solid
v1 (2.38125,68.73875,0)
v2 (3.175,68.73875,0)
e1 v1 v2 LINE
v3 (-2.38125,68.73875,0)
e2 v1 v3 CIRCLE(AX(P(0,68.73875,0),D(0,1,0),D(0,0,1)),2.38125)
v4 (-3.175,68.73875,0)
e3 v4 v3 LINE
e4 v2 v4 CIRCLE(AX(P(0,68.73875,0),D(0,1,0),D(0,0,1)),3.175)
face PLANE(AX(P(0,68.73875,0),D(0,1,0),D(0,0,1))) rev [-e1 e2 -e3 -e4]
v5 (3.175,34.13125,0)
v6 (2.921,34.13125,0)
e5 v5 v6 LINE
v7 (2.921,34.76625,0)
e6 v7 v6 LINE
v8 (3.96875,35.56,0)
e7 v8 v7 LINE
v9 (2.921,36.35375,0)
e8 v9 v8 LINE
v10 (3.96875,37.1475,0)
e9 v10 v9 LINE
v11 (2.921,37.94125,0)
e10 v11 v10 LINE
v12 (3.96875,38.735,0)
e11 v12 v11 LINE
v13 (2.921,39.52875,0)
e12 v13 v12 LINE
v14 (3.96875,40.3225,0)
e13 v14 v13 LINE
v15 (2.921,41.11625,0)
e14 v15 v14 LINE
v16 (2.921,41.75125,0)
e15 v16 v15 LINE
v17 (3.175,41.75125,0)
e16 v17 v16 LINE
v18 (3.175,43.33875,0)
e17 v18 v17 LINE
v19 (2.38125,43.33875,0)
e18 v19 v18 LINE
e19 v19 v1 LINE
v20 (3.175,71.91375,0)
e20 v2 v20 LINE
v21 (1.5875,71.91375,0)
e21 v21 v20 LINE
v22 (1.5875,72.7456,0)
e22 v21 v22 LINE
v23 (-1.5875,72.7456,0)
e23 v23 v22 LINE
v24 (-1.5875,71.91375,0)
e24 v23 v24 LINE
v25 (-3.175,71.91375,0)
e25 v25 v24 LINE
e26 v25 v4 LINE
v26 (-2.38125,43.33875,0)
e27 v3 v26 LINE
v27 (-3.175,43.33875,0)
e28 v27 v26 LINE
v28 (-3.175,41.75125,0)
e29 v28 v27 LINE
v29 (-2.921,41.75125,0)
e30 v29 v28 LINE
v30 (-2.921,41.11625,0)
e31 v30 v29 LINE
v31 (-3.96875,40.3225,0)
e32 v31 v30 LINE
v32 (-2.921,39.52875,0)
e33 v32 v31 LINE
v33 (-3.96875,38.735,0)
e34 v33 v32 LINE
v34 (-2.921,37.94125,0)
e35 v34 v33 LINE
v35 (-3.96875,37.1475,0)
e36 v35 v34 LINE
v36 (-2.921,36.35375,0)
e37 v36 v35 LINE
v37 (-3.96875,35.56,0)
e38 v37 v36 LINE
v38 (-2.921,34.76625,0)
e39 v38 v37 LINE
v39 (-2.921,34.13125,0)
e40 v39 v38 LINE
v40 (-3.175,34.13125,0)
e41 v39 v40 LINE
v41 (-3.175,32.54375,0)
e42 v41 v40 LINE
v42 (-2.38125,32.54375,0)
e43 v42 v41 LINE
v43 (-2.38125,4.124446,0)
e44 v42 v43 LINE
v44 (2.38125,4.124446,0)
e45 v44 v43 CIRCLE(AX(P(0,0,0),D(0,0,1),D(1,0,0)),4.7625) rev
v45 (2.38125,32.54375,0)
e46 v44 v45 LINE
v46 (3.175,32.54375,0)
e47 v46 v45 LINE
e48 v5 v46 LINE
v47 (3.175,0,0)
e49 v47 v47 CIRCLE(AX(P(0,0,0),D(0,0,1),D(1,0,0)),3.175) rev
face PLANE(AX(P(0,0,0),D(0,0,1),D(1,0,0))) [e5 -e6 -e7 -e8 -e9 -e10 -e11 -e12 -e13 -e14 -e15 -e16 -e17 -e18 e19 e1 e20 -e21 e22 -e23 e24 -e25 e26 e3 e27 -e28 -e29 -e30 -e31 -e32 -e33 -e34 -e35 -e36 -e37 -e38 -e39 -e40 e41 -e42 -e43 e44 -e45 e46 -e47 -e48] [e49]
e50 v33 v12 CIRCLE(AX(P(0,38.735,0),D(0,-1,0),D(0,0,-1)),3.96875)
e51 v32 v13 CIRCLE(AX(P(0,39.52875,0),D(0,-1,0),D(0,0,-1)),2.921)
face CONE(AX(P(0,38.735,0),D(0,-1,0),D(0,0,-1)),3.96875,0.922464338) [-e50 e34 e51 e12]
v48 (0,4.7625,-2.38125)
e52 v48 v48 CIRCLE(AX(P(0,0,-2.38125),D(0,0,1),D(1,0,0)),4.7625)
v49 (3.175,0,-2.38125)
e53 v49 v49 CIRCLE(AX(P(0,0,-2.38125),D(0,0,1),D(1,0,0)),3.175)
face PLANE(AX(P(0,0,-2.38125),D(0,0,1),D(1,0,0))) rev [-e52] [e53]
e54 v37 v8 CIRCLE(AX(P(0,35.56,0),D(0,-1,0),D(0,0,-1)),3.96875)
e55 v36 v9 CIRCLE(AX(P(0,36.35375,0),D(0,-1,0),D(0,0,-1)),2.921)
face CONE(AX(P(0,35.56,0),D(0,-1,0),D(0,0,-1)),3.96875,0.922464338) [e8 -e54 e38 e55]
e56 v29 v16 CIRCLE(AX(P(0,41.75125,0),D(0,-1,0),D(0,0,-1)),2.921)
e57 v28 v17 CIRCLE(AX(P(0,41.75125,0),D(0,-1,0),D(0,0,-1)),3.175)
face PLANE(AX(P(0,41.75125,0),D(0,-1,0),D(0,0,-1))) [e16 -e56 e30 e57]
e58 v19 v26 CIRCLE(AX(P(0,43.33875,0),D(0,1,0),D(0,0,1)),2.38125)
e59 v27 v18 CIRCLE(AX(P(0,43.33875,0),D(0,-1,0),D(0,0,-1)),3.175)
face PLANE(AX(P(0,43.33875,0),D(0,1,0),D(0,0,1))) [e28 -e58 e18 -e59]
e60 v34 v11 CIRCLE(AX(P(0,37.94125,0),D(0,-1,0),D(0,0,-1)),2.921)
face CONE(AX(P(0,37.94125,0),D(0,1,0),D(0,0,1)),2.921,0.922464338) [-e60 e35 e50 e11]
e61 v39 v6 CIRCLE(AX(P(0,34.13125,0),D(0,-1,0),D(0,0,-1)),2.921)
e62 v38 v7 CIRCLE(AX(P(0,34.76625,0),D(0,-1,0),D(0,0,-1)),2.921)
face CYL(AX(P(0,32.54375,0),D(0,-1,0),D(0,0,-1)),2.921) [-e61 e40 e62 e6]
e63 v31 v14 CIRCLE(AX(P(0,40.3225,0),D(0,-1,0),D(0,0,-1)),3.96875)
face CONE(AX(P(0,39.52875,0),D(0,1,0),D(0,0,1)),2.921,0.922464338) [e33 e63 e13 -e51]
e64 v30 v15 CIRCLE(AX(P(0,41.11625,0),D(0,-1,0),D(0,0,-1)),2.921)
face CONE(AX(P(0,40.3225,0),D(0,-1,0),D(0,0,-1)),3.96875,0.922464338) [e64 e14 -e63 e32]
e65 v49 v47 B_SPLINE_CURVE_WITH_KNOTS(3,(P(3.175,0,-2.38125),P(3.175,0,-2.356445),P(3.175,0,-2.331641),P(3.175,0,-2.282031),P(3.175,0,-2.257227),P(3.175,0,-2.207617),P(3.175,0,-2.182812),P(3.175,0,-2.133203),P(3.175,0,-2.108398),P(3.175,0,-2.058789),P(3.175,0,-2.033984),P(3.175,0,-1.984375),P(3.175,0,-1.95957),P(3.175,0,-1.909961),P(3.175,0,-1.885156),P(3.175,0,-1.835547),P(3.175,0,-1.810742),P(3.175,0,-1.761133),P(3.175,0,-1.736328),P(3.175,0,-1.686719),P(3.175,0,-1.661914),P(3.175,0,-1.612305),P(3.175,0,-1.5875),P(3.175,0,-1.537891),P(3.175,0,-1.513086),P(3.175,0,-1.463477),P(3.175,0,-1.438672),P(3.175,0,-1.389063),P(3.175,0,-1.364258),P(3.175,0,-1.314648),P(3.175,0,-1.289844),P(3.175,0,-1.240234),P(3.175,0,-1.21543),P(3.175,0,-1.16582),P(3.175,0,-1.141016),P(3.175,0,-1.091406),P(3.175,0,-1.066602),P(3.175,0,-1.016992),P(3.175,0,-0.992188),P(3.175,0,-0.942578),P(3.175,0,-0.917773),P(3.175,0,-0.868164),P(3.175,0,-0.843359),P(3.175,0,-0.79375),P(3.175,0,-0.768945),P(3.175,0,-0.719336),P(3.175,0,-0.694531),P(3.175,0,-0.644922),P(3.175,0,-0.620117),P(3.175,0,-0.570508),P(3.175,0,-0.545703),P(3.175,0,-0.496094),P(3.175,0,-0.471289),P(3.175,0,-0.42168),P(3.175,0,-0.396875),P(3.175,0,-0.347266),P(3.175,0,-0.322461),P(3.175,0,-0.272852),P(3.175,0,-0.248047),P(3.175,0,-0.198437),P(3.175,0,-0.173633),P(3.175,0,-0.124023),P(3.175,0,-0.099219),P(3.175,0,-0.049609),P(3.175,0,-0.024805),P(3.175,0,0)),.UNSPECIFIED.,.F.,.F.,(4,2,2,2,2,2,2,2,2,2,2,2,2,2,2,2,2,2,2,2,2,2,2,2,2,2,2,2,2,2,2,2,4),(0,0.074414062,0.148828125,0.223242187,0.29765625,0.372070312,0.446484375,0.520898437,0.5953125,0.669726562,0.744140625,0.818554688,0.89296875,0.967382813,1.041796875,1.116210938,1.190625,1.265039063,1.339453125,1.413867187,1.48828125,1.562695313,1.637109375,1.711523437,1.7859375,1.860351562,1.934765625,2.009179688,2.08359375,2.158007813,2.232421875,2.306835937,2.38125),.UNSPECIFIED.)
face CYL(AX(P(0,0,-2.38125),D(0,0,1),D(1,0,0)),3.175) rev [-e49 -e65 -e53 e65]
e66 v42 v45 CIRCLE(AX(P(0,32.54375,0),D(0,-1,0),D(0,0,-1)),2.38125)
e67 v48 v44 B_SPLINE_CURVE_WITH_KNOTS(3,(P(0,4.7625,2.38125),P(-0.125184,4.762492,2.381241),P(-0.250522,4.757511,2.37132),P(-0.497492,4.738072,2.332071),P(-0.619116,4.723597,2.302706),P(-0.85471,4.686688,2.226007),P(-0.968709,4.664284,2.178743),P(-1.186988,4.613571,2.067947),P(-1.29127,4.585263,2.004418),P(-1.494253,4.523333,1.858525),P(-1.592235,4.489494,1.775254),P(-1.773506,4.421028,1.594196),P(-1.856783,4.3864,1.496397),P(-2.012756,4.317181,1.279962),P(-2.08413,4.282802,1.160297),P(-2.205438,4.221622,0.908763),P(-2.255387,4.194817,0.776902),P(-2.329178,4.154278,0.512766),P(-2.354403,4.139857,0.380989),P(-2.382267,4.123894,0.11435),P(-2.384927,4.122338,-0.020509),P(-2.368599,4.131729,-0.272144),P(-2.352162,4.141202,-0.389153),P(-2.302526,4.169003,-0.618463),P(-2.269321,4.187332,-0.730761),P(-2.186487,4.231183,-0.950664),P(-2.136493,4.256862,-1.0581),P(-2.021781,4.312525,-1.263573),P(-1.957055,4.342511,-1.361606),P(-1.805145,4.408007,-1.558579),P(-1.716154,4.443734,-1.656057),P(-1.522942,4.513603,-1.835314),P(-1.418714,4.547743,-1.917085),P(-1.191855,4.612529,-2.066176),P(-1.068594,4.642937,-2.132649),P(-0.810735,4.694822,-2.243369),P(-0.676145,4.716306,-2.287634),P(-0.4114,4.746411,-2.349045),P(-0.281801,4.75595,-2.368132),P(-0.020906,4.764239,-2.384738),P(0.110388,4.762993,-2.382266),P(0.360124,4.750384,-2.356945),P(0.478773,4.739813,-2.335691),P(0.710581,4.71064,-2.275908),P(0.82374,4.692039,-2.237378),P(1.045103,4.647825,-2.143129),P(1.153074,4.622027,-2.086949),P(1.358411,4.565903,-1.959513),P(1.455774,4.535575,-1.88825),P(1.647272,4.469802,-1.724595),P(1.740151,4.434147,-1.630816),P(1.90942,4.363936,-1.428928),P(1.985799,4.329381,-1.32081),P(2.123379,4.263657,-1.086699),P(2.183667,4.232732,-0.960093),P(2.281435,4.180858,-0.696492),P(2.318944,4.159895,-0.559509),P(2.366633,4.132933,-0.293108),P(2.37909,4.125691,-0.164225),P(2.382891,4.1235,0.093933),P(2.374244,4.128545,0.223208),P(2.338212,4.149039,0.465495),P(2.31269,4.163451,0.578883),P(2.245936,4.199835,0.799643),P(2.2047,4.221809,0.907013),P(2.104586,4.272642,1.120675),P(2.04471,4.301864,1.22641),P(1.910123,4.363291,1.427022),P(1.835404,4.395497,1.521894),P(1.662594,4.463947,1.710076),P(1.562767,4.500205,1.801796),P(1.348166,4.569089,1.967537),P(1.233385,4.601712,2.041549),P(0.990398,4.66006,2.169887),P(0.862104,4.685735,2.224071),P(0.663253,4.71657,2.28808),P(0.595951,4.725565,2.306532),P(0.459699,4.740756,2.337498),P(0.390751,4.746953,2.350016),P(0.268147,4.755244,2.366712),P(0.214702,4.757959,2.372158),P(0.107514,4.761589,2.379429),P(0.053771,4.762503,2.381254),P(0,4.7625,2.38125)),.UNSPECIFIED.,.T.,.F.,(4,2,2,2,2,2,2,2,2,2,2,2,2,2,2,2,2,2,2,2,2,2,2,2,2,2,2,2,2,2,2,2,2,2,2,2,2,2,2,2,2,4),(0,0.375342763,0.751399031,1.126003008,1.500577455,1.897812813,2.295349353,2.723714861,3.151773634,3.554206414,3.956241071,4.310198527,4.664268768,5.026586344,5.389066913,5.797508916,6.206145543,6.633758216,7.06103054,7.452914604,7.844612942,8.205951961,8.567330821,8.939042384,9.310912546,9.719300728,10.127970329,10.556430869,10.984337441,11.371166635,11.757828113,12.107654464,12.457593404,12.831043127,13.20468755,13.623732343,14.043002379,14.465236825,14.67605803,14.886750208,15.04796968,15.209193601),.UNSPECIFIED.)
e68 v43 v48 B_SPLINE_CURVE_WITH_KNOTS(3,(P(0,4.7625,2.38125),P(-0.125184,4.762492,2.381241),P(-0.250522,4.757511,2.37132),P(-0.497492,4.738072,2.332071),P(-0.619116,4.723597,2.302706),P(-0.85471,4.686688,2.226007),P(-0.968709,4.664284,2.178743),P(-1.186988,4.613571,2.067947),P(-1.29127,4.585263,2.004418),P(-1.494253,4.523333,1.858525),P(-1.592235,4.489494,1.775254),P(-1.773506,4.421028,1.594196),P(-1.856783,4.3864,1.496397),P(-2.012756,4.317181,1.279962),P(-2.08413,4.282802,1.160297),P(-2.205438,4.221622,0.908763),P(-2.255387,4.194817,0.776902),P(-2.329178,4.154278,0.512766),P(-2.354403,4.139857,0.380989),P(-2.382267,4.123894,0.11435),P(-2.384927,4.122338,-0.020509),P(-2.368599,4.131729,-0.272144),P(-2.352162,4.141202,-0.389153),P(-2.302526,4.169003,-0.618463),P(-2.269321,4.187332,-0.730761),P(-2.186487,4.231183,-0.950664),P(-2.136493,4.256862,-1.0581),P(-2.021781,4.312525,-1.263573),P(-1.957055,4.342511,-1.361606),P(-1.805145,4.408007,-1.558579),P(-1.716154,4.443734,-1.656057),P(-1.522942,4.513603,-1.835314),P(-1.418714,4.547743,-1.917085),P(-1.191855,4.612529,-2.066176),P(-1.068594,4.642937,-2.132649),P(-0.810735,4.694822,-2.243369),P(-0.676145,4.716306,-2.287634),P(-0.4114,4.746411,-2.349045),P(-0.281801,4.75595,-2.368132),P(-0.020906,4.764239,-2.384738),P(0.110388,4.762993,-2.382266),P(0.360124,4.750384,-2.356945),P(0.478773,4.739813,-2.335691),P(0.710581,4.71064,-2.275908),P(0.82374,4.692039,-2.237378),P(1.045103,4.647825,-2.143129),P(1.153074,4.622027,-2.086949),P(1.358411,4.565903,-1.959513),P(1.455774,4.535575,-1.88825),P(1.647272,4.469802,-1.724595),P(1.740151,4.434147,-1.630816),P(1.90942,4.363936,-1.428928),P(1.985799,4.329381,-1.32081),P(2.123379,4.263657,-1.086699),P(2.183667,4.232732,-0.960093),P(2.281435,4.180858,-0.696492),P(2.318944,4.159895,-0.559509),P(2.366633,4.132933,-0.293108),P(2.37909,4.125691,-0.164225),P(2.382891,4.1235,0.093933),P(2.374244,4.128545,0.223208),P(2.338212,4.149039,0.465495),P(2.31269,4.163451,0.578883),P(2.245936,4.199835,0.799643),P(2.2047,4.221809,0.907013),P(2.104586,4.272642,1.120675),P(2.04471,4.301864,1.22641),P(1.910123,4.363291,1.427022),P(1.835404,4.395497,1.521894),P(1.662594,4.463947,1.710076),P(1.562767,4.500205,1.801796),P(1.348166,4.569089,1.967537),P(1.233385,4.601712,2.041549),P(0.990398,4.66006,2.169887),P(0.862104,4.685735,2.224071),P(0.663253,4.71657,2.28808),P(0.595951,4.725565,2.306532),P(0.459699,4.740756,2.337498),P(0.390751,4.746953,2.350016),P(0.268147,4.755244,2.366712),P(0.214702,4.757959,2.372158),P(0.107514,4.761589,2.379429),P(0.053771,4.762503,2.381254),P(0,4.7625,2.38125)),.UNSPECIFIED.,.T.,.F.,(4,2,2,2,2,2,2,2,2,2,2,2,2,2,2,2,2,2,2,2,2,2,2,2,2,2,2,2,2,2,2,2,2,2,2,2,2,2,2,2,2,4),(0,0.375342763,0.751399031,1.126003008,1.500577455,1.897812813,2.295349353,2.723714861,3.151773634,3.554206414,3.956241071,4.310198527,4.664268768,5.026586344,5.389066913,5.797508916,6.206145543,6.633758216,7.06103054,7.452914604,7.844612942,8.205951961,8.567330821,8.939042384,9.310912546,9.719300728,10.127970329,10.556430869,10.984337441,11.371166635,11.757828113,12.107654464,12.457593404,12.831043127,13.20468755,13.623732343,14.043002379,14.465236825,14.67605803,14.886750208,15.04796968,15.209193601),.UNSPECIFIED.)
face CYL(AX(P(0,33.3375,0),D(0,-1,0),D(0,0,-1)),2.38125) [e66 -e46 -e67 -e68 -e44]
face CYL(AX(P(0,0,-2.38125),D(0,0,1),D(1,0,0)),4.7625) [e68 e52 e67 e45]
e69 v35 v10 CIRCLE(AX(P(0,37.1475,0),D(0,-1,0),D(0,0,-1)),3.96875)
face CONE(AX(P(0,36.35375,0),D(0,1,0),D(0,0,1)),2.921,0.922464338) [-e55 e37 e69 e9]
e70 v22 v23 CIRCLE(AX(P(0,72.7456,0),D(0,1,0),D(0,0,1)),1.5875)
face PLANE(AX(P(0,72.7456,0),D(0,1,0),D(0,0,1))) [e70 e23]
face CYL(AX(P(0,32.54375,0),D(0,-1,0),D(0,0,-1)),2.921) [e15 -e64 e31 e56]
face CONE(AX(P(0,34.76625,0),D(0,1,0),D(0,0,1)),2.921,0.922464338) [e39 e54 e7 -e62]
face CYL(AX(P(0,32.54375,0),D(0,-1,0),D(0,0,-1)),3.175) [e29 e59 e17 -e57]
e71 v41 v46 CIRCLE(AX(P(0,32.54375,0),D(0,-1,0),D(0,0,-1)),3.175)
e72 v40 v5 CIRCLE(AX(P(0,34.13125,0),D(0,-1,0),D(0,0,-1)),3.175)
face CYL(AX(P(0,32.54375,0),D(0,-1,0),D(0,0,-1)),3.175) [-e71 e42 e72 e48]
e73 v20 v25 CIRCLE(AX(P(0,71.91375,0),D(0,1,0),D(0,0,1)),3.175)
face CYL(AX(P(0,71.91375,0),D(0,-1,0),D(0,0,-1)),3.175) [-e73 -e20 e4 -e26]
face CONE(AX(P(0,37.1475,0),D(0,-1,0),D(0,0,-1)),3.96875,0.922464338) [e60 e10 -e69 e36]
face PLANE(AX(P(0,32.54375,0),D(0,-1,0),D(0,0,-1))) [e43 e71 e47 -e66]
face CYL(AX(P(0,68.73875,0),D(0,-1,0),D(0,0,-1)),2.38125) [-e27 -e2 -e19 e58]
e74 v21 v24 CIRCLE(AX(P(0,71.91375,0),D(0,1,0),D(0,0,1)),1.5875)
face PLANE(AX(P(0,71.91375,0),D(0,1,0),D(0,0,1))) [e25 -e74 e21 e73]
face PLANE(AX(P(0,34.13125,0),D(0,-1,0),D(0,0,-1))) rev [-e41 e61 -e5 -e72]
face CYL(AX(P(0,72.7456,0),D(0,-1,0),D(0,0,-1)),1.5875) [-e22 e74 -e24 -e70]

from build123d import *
from build123d.topology import SkipClean

# Parameters (mm, degrees)
BOSS_EXTRUDE1_DEPTH                  = 4.7625
BOSS_EXTRUDE1_DEPTH_BACK             = 2.38125
SKETCH1_R                            = 4.7625
SKETCH1_R_2                          = 3.175
SKETCH2_R                            = 2.38125
BOSS_EXTRUDE2_DEPTH                  = 28.575
BOSS_EXTRUDE2_DIRECTION_2_REACH      = 13.666
BOSS_EXTRUDE2_DIRECTION_2_END_RADIUS = 4.7625
BOSS_EXTRUDE3_START                  = 25.4
SKETCH4_R                            = 2.38125
BOSS_EXTRUDE3_DEPTH                  = 25.4
SKETCH5_R                            = 3.175
BOSS_EXTRUDE4_DEPTH                  = 3.175
SKETCH6_R                            = 1.5875
BOSS_EXTRUDE5_DEPTH                  = 0.83185
SKETCH7_W                            = 15.534712676
SKETCH7_H                            = 81.822586025
CUT_EXTRUDE1_DEPTH                   = 74.056725452


with BuildPart() as part:
    # Sketch1 → Boss-Extrude1 (new, two sides: drawn at the far end of the back side and taken through both)
    with BuildSketch(Plane.XY.offset(-BOSS_EXTRUDE1_DEPTH_BACK)):
        Circle(SKETCH1_R)
        Circle(SKETCH1_R_2, mode=Mode.SUBTRACT)
    extrude(amount=BOSS_EXTRUDE1_DEPTH + BOSS_EXTRUDE1_DEPTH_BACK)

    # Sketch2 → Boss-Extrude2 (add)
    with BuildSketch(Plane(origin=(0, 4.7625, 0), x_dir=(1, 0, 0), z_dir=(0, 1, 0))):
        Circle(SKETCH2_R)
    extrude(amount=BOSS_EXTRUDE2_DEPTH)

    # Boss-Extrude2 direction 2: up to this cylinder (the profile starts outside it)
    boss_extrude2_direction_2_end = Plane(origin=(0, 0, 0), z_dir=(0, 0, 1)) * Cylinder(BOSS_EXTRUDE2_DIRECTION_2_END_RADIUS, 37.857, mode=Mode.PRIVATE)
    # Sketch2 → Boss-Extrude2 direction 2 (add, up to the surface)
    with BuildSketch(Plane(origin=(0, 4.7625, 0), x_dir=(1, 0, 0), z_dir=(0, 1, 0)), mode=Mode.PRIVATE) as boss_extrude2_direction_2_sk1:
        Circle(SKETCH2_R)
    boss_extrude2_direction_2_tool1 = extrude(boss_extrude2_direction_2_sk1.sketch, amount=-BOSS_EXTRUDE2_DIRECTION_2_REACH, mode=Mode.PRIVATE) - boss_extrude2_direction_2_end
    add(boss_extrude2_direction_2_tool1.solids().sort_by_distance((0, 4.7625, 0))[0])
    add(boss_extrude2_direction_2_tool1.solids().sort_by_distance((0, 4.7625, 0))[1])

    # Sketch3 → Revolve1 (revolve)
    with SkipClean():  # the faces are left unmerged after this step: merging them gives an invalid solid
        with BuildSketch(Plane(origin=(0, 0, 0), x_dir=(0, 0, -1), z_dir=(1, 0, 0))):
            Polygon((-2.921, 34.76625), (-2.921, 34.13125), (-3.175, 34.13125), (-3.175, 32.54375), (0, 32.54375), (0, 43.33875), (-3.175, 43.33875), (-3.175, 41.75125), (-2.921, 41.75125), (-2.921, 41.11625), (-3.96875, 40.3225), (-2.921, 39.52875), (-3.96875, 38.735), (-2.921, 37.94125), (-3.96875, 37.1475), (-2.921, 36.35375), (-3.96875, 35.56), align=None)
        revolve(axis=Axis((0, 32.54375, 0), (0, 1, 0)))

    # Sketch4 → Boss-Extrude3 (add)
    with SkipClean():  # the faces are left unmerged after this step: merging them gives an invalid solid
        with BuildSketch(Plane(origin=(0, 43.33875, 0), x_dir=(1, 0, 0), z_dir=(0, 1, 0)).offset(BOSS_EXTRUDE3_START)):
            Circle(SKETCH4_R)
        extrude(amount=-BOSS_EXTRUDE3_DEPTH)

    # Sketch5 → Boss-Extrude4 (add)
    with SkipClean():  # the faces are left unmerged after this step: merging them gives an invalid solid
        with BuildSketch(Plane(origin=(0, 68.73875, 0), x_dir=(1, 0, 0), z_dir=(0, 1, 0))):
            Circle(SKETCH5_R)
        extrude(amount=BOSS_EXTRUDE4_DEPTH)

    # Sketch6 → Boss-Extrude5 (add)
    with SkipClean():  # the faces are left unmerged after this step: merging them gives an invalid solid
        with BuildSketch(Plane(origin=(0, 71.91375, 0), x_dir=(1, 0, 0), z_dir=(0, 1, 0))):
            Circle(SKETCH6_R)
        extrude(amount=BOSS_EXTRUDE5_DEPTH)

    # Sketch7 → Cut-Extrude1 (cut, through all)
    with SkipClean():  # the faces are left unmerged after this step: merging them gives an invalid solid
        with BuildSketch(Plane.XY):
            with Locations((0.627177841, 34.425750044)):
                Rectangle(SKETCH7_W, SKETCH7_H)
        extrude(amount=CUT_EXTRUDE1_DEPTH, mode=Mode.SUBTRACT)


solid = part.part
